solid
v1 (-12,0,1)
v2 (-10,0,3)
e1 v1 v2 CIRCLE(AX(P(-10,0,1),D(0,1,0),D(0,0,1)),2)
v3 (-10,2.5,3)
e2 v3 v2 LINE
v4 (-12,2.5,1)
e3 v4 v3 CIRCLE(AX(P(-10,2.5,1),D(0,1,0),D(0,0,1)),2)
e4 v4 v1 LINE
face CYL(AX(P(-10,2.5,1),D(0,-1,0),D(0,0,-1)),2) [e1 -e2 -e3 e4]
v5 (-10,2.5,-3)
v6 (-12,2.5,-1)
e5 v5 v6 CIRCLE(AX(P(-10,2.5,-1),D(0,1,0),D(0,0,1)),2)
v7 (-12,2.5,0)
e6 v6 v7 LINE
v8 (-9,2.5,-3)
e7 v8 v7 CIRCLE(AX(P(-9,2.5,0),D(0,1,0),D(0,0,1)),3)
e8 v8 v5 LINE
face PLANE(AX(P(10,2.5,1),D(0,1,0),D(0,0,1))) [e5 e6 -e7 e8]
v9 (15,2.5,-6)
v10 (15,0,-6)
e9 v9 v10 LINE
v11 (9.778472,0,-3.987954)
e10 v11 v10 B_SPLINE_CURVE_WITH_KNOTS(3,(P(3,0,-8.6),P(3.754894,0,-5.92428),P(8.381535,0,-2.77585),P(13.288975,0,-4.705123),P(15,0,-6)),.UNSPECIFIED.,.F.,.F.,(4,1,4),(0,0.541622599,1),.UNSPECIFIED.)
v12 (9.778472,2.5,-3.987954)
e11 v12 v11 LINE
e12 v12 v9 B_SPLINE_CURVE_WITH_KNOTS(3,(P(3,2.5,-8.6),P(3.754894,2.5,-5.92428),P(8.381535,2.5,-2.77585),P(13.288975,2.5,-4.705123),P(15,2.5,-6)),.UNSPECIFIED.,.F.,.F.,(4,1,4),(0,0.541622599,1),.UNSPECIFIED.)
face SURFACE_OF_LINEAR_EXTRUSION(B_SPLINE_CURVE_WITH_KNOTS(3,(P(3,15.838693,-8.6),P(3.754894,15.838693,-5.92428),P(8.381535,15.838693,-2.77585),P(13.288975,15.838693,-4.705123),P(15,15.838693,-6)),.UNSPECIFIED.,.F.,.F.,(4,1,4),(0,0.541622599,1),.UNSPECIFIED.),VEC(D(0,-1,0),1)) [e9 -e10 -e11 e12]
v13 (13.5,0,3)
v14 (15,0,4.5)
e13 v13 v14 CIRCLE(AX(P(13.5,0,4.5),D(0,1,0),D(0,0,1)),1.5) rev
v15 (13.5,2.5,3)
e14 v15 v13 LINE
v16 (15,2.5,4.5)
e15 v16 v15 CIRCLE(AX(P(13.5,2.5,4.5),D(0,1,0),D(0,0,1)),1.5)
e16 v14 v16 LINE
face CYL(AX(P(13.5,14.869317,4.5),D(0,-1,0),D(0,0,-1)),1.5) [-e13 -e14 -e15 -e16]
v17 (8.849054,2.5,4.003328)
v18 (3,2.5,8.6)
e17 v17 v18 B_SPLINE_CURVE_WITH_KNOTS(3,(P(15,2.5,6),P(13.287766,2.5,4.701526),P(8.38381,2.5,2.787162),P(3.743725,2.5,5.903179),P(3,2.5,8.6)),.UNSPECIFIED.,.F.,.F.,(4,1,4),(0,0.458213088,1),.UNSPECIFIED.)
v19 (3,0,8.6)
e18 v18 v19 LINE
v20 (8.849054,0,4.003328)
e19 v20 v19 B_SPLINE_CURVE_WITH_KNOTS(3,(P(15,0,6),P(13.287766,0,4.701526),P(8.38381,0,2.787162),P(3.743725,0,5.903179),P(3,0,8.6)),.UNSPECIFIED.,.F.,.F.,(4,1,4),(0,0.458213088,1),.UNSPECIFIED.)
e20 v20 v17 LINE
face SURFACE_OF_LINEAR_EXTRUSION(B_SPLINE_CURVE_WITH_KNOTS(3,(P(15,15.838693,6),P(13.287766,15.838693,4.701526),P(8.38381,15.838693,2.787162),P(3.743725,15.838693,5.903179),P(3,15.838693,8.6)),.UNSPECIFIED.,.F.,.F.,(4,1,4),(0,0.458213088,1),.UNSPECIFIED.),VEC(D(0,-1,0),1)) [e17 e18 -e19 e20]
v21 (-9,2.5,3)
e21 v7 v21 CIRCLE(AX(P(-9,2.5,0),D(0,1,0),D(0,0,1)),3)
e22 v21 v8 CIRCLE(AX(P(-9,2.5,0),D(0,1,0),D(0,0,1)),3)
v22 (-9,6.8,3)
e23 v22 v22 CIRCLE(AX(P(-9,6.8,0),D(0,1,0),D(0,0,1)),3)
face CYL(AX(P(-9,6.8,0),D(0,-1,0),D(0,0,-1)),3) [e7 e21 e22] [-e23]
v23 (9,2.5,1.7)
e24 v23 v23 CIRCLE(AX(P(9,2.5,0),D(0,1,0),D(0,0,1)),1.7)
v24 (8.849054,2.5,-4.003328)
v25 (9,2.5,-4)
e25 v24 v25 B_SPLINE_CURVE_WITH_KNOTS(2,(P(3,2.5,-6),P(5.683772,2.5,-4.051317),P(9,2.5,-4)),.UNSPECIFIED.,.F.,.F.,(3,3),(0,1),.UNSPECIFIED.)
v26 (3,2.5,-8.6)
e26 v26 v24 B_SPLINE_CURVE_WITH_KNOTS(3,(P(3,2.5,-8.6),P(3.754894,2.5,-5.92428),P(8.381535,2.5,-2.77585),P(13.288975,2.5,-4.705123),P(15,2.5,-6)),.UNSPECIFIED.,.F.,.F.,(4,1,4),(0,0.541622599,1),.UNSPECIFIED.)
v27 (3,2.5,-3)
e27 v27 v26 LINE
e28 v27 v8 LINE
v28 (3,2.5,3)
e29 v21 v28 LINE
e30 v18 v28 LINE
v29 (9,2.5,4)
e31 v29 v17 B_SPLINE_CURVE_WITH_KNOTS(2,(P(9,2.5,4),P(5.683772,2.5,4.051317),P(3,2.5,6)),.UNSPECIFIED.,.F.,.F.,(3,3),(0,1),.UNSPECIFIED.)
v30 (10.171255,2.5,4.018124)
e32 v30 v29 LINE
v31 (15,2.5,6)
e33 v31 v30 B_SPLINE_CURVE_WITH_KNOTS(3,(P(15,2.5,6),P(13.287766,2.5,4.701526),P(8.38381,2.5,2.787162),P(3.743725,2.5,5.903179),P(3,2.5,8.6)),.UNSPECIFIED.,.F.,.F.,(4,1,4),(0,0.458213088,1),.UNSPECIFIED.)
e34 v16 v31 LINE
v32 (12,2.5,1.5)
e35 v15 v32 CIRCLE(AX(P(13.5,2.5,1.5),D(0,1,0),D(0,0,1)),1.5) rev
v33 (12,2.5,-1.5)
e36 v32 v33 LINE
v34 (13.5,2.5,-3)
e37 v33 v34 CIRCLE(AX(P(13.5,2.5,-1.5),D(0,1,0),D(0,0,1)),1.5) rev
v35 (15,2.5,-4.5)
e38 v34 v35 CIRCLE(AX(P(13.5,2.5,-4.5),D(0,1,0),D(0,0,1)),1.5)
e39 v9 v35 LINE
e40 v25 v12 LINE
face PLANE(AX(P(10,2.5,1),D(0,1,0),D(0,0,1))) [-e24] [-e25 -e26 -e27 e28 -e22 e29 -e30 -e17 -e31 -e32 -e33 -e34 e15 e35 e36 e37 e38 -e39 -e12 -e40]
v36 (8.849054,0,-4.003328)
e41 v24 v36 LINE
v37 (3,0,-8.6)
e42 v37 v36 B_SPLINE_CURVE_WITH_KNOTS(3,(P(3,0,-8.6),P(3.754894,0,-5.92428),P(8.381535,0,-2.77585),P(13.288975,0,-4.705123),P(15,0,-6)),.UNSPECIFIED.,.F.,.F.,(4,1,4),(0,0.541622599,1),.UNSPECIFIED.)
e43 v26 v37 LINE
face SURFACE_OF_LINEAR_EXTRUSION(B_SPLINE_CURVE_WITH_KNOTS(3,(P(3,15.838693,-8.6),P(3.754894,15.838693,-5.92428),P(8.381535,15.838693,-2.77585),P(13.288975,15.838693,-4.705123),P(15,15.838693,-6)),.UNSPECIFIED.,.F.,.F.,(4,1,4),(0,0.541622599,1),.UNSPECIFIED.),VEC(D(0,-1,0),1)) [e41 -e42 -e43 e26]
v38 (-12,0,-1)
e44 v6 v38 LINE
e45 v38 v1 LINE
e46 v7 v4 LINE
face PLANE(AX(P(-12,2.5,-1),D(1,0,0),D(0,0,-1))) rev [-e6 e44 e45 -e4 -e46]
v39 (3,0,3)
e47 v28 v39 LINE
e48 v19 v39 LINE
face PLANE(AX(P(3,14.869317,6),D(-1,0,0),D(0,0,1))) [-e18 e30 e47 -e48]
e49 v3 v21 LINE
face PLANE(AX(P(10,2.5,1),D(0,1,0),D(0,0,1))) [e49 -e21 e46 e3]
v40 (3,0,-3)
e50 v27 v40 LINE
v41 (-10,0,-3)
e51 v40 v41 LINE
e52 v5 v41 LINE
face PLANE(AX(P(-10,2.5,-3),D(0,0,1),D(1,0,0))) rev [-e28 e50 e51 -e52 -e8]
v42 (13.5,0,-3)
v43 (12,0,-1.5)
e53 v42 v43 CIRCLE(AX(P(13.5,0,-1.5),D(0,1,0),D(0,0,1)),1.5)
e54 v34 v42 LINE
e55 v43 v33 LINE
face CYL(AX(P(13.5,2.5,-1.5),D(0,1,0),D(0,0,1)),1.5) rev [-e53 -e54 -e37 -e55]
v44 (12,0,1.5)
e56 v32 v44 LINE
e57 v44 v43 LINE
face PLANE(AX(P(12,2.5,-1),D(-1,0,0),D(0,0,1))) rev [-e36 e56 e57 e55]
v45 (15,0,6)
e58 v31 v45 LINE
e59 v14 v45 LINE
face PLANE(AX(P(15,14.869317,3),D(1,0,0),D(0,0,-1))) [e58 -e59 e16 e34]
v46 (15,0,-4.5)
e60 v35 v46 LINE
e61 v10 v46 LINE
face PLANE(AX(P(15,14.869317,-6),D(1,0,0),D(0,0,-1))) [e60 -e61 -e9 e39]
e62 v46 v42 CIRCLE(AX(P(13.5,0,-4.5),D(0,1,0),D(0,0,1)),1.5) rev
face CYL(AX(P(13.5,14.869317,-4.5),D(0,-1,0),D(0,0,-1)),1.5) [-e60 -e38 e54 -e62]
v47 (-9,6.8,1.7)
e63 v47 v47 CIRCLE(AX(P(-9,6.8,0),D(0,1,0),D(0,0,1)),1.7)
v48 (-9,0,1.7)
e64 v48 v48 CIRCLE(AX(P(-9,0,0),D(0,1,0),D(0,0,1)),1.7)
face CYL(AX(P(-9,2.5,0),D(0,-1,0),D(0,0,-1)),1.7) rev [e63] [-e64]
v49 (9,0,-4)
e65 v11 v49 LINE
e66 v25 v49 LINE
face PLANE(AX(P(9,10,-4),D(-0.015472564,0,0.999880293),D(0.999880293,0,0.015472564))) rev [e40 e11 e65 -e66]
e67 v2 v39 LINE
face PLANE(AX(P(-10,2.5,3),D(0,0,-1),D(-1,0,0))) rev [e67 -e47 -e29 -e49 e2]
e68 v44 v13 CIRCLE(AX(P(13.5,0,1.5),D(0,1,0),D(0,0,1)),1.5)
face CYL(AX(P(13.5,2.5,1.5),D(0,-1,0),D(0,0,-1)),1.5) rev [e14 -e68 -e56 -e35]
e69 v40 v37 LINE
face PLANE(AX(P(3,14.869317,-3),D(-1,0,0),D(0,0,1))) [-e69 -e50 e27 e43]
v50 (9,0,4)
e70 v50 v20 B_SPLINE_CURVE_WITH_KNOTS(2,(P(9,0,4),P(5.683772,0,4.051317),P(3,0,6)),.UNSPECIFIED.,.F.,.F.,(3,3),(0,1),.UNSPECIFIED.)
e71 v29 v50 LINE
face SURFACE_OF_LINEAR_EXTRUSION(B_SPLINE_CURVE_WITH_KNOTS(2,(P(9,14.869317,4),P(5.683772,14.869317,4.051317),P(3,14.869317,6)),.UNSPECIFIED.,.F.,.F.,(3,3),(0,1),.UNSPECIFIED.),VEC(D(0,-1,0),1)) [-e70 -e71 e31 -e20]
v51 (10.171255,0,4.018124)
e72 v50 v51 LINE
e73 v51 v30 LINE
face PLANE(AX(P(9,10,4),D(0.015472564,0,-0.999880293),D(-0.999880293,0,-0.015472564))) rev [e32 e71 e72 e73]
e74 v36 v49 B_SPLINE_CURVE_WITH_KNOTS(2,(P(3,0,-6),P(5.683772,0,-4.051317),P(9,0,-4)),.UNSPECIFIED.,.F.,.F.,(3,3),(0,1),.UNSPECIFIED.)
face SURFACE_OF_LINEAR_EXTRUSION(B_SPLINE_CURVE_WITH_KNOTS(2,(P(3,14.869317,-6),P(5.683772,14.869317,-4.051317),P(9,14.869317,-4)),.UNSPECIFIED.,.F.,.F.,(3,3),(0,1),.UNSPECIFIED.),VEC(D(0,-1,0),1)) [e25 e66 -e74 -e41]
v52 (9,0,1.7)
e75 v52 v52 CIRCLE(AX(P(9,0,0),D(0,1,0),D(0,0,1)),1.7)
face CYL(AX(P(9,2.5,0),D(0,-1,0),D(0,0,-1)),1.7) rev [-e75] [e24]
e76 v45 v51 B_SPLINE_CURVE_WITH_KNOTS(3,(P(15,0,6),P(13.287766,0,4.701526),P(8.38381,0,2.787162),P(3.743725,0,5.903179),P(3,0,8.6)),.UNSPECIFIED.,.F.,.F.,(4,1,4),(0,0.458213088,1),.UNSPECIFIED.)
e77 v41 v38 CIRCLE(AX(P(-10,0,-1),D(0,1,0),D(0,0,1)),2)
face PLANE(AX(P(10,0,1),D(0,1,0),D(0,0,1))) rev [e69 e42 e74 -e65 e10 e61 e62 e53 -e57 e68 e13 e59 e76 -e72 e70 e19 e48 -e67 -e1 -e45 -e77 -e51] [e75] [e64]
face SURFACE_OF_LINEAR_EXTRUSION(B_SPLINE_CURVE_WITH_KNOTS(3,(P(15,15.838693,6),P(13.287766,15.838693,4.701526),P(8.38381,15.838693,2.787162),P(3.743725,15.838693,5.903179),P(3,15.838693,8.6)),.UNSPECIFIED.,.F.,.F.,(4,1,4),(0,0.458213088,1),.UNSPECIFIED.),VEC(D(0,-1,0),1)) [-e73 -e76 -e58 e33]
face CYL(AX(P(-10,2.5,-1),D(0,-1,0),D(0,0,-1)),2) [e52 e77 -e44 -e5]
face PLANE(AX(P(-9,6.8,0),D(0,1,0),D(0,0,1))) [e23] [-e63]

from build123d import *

# Parameters (mm, degrees)
SKETCH_1_R          = 1.7
EXTRUDE_1_DEPTH     = 2.5
SKETCH_3_R          = 3
SKETCH_3_R_2        = 1.7
EXTRUDE_2_DEPTH     = 4.3
EXTRUDE_3_DEPTH     = 2.5
EXTRUDE_4_DEPTH     = 2.5
CUT_EXTRUDE_2_DEPTH = 10
EXTRUDE_6_DEPTH     = 2.5
FILLET_START        = -1
FILLET_1_DEPTH      = 3.5
FILLET_1_2_DEPTH    = 2.5


with BuildPart() as part:
    # 草图1 → 凸台-拉伸1 (new body)
    with BuildSketch(Plane(origin=(0, 0, 0), x_dir=(1, 0, 0), z_dir=(0, 1, 0))):
        with BuildLine():
            Line((-10, 3), (10, 3))
            ThreePointArc((10, 3), (11.414213562, 2.414213562), (12, 1))
            Line((12, 1), (12, -1))
            ThreePointArc((12, -1), (11.414213562, -2.414213562), (10, -3))
            Line((10, -3), (-10, -3))
            ThreePointArc((-10, -3), (-11.414213562, -2.414213562), (-12, -1))
            Line((-12, -1), (-12, 1))
            ThreePointArc((-12, 1), (-11.414213562, 2.414213562), (-10, 3))
        make_face()
        with Locations(Location((-9, 0, 0), (0, 0, 270))):
            Circle(SKETCH_1_R, mode=Mode.SUBTRACT)
        with Locations(Location((9, 0, 0), (0, 0, 270))):
            Circle(SKETCH_1_R, mode=Mode.SUBTRACT)
    extrude(amount=EXTRUDE_1_DEPTH)

    # 草图3 → 凸台-拉伸2 (add)
    with BuildSketch(Plane(origin=(0, 2.5, 0), x_dir=(1, 0, 0), z_dir=(0, 1, 0))):
        with Locations(Location((-9, 0, 0), (0, 0, 270))):
            Circle(SKETCH_3_R)
        with Locations(Location((-9, 0, 0), (0, 0, 270))):
            Circle(SKETCH_3_R_2, mode=Mode.SUBTRACT)
    extrude(amount=EXTRUDE_2_DEPTH)

    # 草图4 → 凸台-拉伸3 (add)
    with BuildSketch(Plane.XZ):
        with BuildLine():
            Line((3, -3), (3, -6))
            add(Edge.make_bspline(
                [(9, -4), (5.683772234, -4.051316702), (3, -6)],
                knots=[0, 0, 0, 1, 1, 1], degree=2))
            add(Edge.make_bspline(
                [(9, -4), (12.316227766, -4.051316702), (15, -6)],
                knots=[0, 0, 0, 1, 1, 1], degree=2))
            Line((15, -6), (15, -3))
            Line((15, -3), (3, -3))
        make_face()
        with BuildLine():
            Line((3, 3), (15, 3))
            Line((15, 3), (15, 6))
            add(Edge.make_bspline(
                [(9, 4), (12.316227766, 4.051316702), (15, 6)],
                knots=[0, 0, 0, 1, 1, 1], degree=2))
            add(Edge.make_bspline(
                [(9, 4), (5.683772234, 4.051316702), (3, 6)],
                knots=[0, 0, 0, 1, 1, 1], degree=2))
            Line((3, 6), (3, 3))
        make_face()
    extrude(amount=-EXTRUDE_3_DEPTH)

    # 草图5 → 凸台-拉伸4 (add)
    with BuildSketch(Plane.XZ):
        Polygon((9.41538426, 3.145270203), (11.442509661, 0.357972777), (9.41538426, -3.078638254), (11.917617176, -3.601256521), (12, -3.235006375), (12, 3.620377719), align=None)
    extrude(amount=-EXTRUDE_4_DEPTH)

    # 草图10 → 切除-拉伸2 (cut)
    with BuildSketch(Plane.XZ):
        Polygon((9, 4), (14.708854471, 4.088341194), (15, 6), align=None)
        Polygon((9, -4), (14.512519064, -3.914696982), (15, -6), align=None)
    extrude(amount=-CUT_EXTRUDE_2_DEPTH, mode=Mode.SUBTRACT)

    # 草图11 → 凸台-拉伸6 (add)
    with BuildSketch(Plane.XZ):
        with BuildLine():
            Line((15, 6), (15, 3.4))
            Line((15, 3.4), (3, 3.4))
            Line((3, 3.4), (3, 8.6))
            add(Edge.make_bspline(
                [(3, 8.6), (3.743724888, 5.90317916), (8.383809549, 2.787162352), (13.287766409, 4.701526195), (15, 6)],
                knots=[0, 0, 0, 0, 0.541786912, 1, 1, 1, 1], degree=3))
        make_face()
        with BuildLine():
            Line((3, -8.6), (3, -3.580116595))
            Line((3, -3.580116595), (15, -3.580116595))
            Line((15, -3.580116595), (15, -6))
            add(Edge.make_bspline(
                [(15, -6), (13.28897523, -4.705122665), (8.381534555, -2.775849949), (3.754894418, -5.92427983), (3, -8.6)],
                knots=[0, 0, 0, 0, 0.458377401, 1, 1, 1, 1], degree=3))
        make_face()
    extrude(amount=-EXTRUDE_6_DEPTH)

    # 圆角1: read off the stored shape, not the designer's step
    # 圆角1 outline → 圆角1 (cut)
    with BuildSketch(Plane(origin=(0, 0, 0), x_dir=(1, 0, 0), z_dir=(0, 1, 0)).offset(FILLET_START)):
        with BuildLine():
            Line((15, -3), (13.5, -3))
            ThreePointArc((13.5, -3), (14.560660172, -3.439339828), (15, -4.5))
            Line((15, -4.5), (15, -3))
        make_face()
        with BuildLine():
            ThreePointArc((15, 4.5), (14.560660172, 3.439339828), (13.5, 3))
            Line((13.5, 3), (15, 3))
            Line((15, 3), (15, 4.5))
        make_face()
    extrude(amount=FILLET_1_DEPTH, mode=Mode.SUBTRACT)

    # Fillet 1 2 outline → Fillet 1 2 (add)
    with BuildSketch(Plane(origin=(0, 0, 0), x_dir=(1, 0, 0), z_dir=(0, 1, 0))):
        with BuildLine():
            ThreePointArc((13.5, -3), (12.439339828, -2.560660172), (12, -1.5))
            Line((12, -1.5), (12, -3))
            Line((12, -3), (13.5, -3))
        make_face()
        with BuildLine():
            ThreePointArc((12, 1.5), (12.439339828, 2.560660172), (13.5, 3))
            Line((13.5, 3), (12, 3))
            Line((12, 3), (12, 1.5))
        make_face()
    extrude(amount=FILLET_1_2_DEPTH)


solid = part.part
